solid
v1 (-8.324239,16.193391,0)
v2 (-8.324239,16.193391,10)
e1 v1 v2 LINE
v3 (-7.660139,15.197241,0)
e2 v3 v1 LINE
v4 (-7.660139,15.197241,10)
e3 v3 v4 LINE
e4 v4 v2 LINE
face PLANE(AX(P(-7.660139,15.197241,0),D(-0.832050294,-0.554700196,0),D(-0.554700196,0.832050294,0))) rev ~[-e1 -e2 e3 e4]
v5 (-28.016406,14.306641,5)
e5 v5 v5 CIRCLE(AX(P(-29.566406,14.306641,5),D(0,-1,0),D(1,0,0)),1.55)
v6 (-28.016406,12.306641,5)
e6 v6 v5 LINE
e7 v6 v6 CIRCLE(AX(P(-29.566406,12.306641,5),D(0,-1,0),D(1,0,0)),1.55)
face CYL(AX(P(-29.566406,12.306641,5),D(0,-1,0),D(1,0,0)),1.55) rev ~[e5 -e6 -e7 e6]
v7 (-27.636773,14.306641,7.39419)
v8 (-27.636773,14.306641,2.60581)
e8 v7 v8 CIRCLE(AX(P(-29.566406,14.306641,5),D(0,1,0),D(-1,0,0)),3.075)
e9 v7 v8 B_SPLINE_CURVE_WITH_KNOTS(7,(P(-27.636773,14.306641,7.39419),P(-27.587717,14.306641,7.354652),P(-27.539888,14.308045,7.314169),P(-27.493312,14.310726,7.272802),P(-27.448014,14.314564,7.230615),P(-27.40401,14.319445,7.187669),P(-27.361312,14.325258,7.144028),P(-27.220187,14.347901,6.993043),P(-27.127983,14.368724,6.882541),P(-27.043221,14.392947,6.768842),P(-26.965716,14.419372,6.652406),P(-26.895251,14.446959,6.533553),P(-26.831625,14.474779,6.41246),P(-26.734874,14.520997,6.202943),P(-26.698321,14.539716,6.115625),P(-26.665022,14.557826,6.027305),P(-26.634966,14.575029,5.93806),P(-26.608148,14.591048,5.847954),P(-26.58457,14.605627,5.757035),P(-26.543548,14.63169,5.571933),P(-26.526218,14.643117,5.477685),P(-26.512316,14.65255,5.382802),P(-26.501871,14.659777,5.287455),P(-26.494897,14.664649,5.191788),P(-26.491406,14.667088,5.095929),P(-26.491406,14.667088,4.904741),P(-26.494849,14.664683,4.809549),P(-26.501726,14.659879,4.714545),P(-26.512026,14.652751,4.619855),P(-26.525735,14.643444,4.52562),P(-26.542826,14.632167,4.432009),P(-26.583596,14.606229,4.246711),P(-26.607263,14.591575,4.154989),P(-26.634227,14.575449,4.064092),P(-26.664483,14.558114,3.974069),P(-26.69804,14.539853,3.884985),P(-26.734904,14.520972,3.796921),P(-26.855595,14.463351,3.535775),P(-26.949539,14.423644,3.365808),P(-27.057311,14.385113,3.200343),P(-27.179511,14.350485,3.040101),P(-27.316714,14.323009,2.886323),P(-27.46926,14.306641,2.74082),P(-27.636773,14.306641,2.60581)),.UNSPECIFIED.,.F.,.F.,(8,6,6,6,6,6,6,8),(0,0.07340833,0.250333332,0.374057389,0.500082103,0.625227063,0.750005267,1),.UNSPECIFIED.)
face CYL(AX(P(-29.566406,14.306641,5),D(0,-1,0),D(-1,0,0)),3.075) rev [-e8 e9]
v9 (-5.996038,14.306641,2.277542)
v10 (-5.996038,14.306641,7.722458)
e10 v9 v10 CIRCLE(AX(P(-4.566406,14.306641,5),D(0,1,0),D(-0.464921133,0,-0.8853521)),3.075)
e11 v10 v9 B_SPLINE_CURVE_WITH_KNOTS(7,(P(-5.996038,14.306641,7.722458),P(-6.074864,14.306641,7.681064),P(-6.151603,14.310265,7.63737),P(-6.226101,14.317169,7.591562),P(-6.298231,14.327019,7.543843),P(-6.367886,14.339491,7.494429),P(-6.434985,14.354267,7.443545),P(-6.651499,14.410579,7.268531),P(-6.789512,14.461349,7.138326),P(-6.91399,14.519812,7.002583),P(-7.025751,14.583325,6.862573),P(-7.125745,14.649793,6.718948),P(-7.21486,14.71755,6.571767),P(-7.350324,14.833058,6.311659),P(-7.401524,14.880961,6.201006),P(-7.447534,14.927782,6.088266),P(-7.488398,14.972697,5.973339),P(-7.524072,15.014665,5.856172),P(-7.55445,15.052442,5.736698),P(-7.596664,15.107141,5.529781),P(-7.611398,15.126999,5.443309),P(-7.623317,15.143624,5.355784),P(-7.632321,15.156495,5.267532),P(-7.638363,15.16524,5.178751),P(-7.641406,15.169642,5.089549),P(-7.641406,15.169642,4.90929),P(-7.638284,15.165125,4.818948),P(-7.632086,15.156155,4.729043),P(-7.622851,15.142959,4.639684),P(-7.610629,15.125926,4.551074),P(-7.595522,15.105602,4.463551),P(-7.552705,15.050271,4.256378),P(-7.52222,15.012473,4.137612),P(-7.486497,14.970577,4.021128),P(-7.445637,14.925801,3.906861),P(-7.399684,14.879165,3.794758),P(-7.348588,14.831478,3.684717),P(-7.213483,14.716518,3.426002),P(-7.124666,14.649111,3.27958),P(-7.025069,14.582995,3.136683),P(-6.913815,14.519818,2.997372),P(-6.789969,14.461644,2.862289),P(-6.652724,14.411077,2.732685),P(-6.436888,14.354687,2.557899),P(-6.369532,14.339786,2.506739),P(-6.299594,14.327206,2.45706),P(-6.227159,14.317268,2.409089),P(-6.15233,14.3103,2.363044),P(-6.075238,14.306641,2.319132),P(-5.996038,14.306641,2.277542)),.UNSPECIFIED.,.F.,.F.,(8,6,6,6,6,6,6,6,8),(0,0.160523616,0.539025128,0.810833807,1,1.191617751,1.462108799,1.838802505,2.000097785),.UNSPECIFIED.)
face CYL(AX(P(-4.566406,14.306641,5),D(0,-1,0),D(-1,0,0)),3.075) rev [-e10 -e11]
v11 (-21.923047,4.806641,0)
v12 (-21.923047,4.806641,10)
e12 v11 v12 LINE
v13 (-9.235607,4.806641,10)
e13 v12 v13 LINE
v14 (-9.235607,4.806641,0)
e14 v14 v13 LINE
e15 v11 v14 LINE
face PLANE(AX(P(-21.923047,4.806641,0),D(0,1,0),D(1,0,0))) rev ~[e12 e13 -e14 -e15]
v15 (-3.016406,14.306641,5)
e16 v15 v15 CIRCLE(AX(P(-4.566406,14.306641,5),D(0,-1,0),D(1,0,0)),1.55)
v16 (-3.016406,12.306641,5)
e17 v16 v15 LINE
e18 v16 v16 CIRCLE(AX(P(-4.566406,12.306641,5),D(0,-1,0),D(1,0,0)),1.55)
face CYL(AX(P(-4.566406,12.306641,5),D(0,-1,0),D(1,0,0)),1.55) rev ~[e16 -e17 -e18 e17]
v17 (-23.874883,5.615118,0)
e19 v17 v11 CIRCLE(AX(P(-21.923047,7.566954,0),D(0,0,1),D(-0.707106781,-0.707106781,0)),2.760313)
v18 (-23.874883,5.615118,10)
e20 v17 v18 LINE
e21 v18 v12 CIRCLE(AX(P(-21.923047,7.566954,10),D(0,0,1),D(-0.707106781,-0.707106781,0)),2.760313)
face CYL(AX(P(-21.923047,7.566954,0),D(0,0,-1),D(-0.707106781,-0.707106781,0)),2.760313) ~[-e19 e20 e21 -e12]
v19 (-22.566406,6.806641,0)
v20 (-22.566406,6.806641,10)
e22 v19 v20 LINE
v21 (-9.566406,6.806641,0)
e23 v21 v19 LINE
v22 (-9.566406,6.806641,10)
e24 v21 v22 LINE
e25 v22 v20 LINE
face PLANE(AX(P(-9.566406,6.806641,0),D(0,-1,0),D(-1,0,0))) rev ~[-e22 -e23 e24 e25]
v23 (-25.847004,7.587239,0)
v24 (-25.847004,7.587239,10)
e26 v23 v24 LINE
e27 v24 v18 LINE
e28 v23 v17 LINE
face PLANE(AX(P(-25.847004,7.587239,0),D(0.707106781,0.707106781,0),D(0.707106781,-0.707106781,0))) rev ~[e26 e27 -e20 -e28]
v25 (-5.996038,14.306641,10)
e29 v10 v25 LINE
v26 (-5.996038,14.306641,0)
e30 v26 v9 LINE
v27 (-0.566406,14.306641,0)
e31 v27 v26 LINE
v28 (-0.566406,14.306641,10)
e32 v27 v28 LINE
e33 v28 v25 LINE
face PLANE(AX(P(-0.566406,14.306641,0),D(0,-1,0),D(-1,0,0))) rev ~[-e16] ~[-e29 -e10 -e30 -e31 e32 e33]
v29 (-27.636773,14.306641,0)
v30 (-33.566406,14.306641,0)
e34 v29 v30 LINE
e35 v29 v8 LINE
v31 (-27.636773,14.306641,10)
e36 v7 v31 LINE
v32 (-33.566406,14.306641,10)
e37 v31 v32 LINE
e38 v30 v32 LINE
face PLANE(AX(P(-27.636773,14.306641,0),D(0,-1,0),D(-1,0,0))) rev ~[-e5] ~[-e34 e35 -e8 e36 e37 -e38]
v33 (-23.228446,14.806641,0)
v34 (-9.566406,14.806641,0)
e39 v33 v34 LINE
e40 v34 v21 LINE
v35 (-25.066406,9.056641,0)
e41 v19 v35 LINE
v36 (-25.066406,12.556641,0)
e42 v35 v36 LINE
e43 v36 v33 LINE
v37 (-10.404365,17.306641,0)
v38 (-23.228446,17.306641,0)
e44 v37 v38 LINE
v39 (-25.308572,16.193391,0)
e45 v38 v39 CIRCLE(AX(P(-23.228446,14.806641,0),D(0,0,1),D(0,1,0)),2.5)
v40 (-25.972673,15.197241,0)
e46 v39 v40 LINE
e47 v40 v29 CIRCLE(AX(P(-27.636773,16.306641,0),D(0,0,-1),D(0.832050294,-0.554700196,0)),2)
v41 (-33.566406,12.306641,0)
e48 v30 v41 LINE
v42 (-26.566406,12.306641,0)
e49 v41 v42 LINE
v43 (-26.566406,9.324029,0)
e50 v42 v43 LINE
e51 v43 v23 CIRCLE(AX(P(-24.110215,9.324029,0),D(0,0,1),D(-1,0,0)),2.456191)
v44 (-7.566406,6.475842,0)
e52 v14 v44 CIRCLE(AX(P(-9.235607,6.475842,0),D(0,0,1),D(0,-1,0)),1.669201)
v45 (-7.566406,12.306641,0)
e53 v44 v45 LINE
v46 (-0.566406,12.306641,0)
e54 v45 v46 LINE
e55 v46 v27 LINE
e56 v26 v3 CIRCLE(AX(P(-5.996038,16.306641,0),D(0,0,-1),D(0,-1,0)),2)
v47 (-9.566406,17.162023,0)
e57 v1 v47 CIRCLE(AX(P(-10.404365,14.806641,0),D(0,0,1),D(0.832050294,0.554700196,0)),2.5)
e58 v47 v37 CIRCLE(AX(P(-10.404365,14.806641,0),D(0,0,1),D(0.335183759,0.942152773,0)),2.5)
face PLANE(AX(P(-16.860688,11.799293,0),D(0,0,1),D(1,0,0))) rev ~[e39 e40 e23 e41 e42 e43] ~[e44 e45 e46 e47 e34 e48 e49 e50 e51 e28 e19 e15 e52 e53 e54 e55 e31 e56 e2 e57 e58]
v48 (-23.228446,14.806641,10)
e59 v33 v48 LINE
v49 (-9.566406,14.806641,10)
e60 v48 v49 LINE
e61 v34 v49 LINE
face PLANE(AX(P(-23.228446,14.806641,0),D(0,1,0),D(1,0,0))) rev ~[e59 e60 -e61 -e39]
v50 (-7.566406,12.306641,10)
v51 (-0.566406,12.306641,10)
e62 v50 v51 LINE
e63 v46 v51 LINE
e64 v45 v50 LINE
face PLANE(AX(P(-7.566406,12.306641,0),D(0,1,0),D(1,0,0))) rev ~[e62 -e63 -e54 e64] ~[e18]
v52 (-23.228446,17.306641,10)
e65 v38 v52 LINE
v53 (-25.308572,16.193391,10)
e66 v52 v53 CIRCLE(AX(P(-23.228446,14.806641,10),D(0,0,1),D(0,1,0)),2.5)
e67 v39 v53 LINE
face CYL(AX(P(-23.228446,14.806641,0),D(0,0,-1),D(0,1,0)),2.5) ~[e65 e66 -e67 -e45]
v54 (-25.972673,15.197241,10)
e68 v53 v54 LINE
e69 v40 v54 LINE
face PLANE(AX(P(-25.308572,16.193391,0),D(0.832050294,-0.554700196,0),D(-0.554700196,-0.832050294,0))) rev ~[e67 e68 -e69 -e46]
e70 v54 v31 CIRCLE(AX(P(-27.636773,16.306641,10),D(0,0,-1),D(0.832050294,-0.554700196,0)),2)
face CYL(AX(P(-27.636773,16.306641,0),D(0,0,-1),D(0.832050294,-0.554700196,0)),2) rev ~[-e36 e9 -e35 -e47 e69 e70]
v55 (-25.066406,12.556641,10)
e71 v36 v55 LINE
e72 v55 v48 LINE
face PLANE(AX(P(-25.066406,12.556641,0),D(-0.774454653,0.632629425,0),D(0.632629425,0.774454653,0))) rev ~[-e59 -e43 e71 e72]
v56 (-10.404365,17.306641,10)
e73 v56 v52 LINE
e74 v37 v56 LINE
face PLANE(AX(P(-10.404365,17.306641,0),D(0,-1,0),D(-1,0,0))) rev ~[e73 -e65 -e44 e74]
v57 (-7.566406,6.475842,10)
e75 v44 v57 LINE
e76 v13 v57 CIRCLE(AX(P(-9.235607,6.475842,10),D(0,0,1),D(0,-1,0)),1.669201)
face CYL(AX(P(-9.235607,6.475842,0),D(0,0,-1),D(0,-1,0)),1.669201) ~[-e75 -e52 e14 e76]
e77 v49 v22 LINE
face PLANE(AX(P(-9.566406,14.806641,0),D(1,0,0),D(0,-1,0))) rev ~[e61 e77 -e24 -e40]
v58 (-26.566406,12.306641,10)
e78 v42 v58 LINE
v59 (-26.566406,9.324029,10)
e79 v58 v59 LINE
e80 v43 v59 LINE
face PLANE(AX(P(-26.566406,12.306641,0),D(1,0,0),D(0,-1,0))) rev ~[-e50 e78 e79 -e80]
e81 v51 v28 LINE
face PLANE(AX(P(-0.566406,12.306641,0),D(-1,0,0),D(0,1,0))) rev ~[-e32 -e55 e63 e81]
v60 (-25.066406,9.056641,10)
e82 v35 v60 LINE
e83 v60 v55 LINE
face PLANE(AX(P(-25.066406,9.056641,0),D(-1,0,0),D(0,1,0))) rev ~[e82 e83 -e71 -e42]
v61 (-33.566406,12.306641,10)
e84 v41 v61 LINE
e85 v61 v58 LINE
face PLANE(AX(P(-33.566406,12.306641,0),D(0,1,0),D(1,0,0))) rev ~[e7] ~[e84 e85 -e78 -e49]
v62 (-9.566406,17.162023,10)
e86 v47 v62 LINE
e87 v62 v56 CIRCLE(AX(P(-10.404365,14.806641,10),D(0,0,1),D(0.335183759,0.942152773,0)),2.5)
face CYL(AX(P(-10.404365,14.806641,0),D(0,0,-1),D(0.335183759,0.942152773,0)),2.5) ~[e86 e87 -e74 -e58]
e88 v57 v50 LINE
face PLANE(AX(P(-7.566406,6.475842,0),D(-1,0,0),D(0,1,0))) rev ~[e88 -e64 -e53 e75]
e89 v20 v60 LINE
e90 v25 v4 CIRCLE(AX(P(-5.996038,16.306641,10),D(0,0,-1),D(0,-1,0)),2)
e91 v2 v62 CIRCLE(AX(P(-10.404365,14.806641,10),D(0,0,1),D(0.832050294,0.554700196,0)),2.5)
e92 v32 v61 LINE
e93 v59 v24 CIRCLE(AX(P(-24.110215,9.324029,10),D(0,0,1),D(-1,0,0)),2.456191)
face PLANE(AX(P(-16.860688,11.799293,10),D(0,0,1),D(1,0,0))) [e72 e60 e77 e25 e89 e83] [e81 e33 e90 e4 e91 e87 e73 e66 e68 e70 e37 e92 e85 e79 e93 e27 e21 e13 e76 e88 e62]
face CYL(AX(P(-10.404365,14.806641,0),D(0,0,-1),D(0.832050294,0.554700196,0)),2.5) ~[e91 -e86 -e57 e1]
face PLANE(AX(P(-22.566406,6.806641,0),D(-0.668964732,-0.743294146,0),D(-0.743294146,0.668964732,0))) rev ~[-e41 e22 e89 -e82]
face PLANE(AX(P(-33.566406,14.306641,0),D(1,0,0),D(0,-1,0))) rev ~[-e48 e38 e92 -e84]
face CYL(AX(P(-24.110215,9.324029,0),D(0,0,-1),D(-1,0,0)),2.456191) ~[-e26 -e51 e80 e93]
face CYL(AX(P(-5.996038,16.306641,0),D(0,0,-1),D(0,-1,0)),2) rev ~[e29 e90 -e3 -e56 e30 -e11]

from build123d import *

# Parameters (mm, degrees)
F1_DEPTH = 10
F2_R     = 1.55
F3_DEPTH = 5
F4_R     = 3.075
F5_DEPTH = 5
F6_R     = 3.075
F7_DEPTH = 5


# Not quite as in the source:
# - a feature names something its author has since deleted; it is built from what else it names


with BuildPart() as f1:
    # F0 (on Top) → F1 (new body)
    with BuildSketch(Plane.XY):
        with BuildLine():
            Line((-1.5664058328, 14.3066409416), (-5.9960383158, 14.3066409416))
            ThreePointArc((-5.9960383158, 14.3066409416), (-6.9397541669, 14.5432917441), (-7.6601389045, 15.1972405492))
            Line((-7.6601389045, 15.1972405492), (-8.3242394931, 16.1933914322))
            ThreePointArc((-8.3242394931, 16.1933914322), (-8.8670406285, 16.7780954993), (-9.5664058328, 17.1620228746))
            ThreePointArc((-9.5664058328, 17.1620228746), (-9.9791916365, 17.2702211446), (-10.404365229, 17.3066409416))
            Line((-10.404365229, 17.3066409416), (-23.2284464365, 17.3066409416))
            ThreePointArc((-23.2284464365, 17.3066409416), (-24.4080912504, 17.0108274386), (-25.3085721724, 16.1933914322))
            Line((-25.3085721724, 16.1933914322), (-25.9726727611, 15.1972405492))
            ThreePointArc((-25.9726727611, 15.1972405492), (-26.6930574987, 14.5432917441), (-27.6367733497, 14.3066409416))
            Line((-27.6367733497, 14.3066409416), (-32.5664058328, 14.3066409416))
            Line((-32.5664058328, 14.3066409416), (-33.5664058328, 14.3066409416))
            Line((-33.5664058328, 14.3066409416), (-33.5664058328, 12.3066409416))
            Line((-33.5664058328, 12.3066409416), (-32.5664058328, 12.3066409416))
            Line((-32.5664058328, 12.3066409416), (-26.5664058328, 12.3066409416))
            Line((-26.5664058328, 12.3066409416), (-26.5664058328, 9.3240286596))
            ThreePointArc((-26.5664058328, 9.3240286596), (-26.3794394083, 8.3840849704), (-25.8470040783, 7.5872391872))
            Line((-25.8470040783, 7.5872391872), (-23.8748829035, 5.6151180124))
            ThreePointArc((-23.8748829035, 5.6151180124), (-22.979372793, 5.0167572865), (-21.9230465945, 4.8066409416))
            Line((-21.9230465945, 4.8066409416), (-9.2356068064, 4.8066409416))
            ThreePointArc((-9.2356068064, 4.8066409416), (-8.0553034788, 5.2955385877), (-7.5664058328, 6.4758419153))
            Line((-7.5664058328, 6.4758419153), (-7.5664058328, 12.3066409416))
            Line((-7.5664058328, 12.3066409416), (-1.5664058328, 12.3066409416))
            Line((-1.5664058328, 12.3066409416), (-0.5664058328, 12.3066409416))
            Line((-0.5664058328, 12.3066409416), (-0.5664058328, 14.3066409416))
            Line((-0.5664058328, 14.3066409416), (-1.5664058328, 14.3066409416))
        make_face()
        Polygon((-9.5664058328, 14.8066409416), (-9.5664058328, 6.8066409416), (-22.5664058328, 6.8066409416), (-25.0664058328, 9.0566409416), (-25.0664058328, 10.8066409416), (-25.0664058328, 12.5566409416), (-23.2284464365, 14.8066409416), (-22.5664058328, 14.8066409416), align=None, mode=Mode.SUBTRACT)
    extrude(amount=F1_DEPTH)

    # F2 (on face) → F3 (cut)
    with BuildSketch(Plane.XZ.offset(-12.3066409416)):
        with Locations((-29.5664058328, 5)):
            Circle(F2_R)
        with Locations((-4.5664058328, 5)):
            Circle(F2_R)
    extrude(amount=-F3_DEPTH, mode=Mode.SUBTRACT)

    # F4 (on face) → F5 (cut)
    with BuildSketch(Plane(origin=(0, 14.3066409416, 0), x_dir=(-1, 0, 0), z_dir=(0, 1, 0))):
        with Locations((29.5664058328, 5)):
            Circle(F4_R)
    extrude(amount=F5_DEPTH, mode=Mode.SUBTRACT)

    # F6 (on face) → F7 (cut)
    with BuildSketch(Plane(origin=(0, 14.3066409416, 0), x_dir=(-1, 0, 0), z_dir=(0, 1, 0))):
        with Locations((4.5664058328, 5)):
            Circle(F6_R)
    extrude(amount=F7_DEPTH, mode=Mode.SUBTRACT)


solid = f1.part
